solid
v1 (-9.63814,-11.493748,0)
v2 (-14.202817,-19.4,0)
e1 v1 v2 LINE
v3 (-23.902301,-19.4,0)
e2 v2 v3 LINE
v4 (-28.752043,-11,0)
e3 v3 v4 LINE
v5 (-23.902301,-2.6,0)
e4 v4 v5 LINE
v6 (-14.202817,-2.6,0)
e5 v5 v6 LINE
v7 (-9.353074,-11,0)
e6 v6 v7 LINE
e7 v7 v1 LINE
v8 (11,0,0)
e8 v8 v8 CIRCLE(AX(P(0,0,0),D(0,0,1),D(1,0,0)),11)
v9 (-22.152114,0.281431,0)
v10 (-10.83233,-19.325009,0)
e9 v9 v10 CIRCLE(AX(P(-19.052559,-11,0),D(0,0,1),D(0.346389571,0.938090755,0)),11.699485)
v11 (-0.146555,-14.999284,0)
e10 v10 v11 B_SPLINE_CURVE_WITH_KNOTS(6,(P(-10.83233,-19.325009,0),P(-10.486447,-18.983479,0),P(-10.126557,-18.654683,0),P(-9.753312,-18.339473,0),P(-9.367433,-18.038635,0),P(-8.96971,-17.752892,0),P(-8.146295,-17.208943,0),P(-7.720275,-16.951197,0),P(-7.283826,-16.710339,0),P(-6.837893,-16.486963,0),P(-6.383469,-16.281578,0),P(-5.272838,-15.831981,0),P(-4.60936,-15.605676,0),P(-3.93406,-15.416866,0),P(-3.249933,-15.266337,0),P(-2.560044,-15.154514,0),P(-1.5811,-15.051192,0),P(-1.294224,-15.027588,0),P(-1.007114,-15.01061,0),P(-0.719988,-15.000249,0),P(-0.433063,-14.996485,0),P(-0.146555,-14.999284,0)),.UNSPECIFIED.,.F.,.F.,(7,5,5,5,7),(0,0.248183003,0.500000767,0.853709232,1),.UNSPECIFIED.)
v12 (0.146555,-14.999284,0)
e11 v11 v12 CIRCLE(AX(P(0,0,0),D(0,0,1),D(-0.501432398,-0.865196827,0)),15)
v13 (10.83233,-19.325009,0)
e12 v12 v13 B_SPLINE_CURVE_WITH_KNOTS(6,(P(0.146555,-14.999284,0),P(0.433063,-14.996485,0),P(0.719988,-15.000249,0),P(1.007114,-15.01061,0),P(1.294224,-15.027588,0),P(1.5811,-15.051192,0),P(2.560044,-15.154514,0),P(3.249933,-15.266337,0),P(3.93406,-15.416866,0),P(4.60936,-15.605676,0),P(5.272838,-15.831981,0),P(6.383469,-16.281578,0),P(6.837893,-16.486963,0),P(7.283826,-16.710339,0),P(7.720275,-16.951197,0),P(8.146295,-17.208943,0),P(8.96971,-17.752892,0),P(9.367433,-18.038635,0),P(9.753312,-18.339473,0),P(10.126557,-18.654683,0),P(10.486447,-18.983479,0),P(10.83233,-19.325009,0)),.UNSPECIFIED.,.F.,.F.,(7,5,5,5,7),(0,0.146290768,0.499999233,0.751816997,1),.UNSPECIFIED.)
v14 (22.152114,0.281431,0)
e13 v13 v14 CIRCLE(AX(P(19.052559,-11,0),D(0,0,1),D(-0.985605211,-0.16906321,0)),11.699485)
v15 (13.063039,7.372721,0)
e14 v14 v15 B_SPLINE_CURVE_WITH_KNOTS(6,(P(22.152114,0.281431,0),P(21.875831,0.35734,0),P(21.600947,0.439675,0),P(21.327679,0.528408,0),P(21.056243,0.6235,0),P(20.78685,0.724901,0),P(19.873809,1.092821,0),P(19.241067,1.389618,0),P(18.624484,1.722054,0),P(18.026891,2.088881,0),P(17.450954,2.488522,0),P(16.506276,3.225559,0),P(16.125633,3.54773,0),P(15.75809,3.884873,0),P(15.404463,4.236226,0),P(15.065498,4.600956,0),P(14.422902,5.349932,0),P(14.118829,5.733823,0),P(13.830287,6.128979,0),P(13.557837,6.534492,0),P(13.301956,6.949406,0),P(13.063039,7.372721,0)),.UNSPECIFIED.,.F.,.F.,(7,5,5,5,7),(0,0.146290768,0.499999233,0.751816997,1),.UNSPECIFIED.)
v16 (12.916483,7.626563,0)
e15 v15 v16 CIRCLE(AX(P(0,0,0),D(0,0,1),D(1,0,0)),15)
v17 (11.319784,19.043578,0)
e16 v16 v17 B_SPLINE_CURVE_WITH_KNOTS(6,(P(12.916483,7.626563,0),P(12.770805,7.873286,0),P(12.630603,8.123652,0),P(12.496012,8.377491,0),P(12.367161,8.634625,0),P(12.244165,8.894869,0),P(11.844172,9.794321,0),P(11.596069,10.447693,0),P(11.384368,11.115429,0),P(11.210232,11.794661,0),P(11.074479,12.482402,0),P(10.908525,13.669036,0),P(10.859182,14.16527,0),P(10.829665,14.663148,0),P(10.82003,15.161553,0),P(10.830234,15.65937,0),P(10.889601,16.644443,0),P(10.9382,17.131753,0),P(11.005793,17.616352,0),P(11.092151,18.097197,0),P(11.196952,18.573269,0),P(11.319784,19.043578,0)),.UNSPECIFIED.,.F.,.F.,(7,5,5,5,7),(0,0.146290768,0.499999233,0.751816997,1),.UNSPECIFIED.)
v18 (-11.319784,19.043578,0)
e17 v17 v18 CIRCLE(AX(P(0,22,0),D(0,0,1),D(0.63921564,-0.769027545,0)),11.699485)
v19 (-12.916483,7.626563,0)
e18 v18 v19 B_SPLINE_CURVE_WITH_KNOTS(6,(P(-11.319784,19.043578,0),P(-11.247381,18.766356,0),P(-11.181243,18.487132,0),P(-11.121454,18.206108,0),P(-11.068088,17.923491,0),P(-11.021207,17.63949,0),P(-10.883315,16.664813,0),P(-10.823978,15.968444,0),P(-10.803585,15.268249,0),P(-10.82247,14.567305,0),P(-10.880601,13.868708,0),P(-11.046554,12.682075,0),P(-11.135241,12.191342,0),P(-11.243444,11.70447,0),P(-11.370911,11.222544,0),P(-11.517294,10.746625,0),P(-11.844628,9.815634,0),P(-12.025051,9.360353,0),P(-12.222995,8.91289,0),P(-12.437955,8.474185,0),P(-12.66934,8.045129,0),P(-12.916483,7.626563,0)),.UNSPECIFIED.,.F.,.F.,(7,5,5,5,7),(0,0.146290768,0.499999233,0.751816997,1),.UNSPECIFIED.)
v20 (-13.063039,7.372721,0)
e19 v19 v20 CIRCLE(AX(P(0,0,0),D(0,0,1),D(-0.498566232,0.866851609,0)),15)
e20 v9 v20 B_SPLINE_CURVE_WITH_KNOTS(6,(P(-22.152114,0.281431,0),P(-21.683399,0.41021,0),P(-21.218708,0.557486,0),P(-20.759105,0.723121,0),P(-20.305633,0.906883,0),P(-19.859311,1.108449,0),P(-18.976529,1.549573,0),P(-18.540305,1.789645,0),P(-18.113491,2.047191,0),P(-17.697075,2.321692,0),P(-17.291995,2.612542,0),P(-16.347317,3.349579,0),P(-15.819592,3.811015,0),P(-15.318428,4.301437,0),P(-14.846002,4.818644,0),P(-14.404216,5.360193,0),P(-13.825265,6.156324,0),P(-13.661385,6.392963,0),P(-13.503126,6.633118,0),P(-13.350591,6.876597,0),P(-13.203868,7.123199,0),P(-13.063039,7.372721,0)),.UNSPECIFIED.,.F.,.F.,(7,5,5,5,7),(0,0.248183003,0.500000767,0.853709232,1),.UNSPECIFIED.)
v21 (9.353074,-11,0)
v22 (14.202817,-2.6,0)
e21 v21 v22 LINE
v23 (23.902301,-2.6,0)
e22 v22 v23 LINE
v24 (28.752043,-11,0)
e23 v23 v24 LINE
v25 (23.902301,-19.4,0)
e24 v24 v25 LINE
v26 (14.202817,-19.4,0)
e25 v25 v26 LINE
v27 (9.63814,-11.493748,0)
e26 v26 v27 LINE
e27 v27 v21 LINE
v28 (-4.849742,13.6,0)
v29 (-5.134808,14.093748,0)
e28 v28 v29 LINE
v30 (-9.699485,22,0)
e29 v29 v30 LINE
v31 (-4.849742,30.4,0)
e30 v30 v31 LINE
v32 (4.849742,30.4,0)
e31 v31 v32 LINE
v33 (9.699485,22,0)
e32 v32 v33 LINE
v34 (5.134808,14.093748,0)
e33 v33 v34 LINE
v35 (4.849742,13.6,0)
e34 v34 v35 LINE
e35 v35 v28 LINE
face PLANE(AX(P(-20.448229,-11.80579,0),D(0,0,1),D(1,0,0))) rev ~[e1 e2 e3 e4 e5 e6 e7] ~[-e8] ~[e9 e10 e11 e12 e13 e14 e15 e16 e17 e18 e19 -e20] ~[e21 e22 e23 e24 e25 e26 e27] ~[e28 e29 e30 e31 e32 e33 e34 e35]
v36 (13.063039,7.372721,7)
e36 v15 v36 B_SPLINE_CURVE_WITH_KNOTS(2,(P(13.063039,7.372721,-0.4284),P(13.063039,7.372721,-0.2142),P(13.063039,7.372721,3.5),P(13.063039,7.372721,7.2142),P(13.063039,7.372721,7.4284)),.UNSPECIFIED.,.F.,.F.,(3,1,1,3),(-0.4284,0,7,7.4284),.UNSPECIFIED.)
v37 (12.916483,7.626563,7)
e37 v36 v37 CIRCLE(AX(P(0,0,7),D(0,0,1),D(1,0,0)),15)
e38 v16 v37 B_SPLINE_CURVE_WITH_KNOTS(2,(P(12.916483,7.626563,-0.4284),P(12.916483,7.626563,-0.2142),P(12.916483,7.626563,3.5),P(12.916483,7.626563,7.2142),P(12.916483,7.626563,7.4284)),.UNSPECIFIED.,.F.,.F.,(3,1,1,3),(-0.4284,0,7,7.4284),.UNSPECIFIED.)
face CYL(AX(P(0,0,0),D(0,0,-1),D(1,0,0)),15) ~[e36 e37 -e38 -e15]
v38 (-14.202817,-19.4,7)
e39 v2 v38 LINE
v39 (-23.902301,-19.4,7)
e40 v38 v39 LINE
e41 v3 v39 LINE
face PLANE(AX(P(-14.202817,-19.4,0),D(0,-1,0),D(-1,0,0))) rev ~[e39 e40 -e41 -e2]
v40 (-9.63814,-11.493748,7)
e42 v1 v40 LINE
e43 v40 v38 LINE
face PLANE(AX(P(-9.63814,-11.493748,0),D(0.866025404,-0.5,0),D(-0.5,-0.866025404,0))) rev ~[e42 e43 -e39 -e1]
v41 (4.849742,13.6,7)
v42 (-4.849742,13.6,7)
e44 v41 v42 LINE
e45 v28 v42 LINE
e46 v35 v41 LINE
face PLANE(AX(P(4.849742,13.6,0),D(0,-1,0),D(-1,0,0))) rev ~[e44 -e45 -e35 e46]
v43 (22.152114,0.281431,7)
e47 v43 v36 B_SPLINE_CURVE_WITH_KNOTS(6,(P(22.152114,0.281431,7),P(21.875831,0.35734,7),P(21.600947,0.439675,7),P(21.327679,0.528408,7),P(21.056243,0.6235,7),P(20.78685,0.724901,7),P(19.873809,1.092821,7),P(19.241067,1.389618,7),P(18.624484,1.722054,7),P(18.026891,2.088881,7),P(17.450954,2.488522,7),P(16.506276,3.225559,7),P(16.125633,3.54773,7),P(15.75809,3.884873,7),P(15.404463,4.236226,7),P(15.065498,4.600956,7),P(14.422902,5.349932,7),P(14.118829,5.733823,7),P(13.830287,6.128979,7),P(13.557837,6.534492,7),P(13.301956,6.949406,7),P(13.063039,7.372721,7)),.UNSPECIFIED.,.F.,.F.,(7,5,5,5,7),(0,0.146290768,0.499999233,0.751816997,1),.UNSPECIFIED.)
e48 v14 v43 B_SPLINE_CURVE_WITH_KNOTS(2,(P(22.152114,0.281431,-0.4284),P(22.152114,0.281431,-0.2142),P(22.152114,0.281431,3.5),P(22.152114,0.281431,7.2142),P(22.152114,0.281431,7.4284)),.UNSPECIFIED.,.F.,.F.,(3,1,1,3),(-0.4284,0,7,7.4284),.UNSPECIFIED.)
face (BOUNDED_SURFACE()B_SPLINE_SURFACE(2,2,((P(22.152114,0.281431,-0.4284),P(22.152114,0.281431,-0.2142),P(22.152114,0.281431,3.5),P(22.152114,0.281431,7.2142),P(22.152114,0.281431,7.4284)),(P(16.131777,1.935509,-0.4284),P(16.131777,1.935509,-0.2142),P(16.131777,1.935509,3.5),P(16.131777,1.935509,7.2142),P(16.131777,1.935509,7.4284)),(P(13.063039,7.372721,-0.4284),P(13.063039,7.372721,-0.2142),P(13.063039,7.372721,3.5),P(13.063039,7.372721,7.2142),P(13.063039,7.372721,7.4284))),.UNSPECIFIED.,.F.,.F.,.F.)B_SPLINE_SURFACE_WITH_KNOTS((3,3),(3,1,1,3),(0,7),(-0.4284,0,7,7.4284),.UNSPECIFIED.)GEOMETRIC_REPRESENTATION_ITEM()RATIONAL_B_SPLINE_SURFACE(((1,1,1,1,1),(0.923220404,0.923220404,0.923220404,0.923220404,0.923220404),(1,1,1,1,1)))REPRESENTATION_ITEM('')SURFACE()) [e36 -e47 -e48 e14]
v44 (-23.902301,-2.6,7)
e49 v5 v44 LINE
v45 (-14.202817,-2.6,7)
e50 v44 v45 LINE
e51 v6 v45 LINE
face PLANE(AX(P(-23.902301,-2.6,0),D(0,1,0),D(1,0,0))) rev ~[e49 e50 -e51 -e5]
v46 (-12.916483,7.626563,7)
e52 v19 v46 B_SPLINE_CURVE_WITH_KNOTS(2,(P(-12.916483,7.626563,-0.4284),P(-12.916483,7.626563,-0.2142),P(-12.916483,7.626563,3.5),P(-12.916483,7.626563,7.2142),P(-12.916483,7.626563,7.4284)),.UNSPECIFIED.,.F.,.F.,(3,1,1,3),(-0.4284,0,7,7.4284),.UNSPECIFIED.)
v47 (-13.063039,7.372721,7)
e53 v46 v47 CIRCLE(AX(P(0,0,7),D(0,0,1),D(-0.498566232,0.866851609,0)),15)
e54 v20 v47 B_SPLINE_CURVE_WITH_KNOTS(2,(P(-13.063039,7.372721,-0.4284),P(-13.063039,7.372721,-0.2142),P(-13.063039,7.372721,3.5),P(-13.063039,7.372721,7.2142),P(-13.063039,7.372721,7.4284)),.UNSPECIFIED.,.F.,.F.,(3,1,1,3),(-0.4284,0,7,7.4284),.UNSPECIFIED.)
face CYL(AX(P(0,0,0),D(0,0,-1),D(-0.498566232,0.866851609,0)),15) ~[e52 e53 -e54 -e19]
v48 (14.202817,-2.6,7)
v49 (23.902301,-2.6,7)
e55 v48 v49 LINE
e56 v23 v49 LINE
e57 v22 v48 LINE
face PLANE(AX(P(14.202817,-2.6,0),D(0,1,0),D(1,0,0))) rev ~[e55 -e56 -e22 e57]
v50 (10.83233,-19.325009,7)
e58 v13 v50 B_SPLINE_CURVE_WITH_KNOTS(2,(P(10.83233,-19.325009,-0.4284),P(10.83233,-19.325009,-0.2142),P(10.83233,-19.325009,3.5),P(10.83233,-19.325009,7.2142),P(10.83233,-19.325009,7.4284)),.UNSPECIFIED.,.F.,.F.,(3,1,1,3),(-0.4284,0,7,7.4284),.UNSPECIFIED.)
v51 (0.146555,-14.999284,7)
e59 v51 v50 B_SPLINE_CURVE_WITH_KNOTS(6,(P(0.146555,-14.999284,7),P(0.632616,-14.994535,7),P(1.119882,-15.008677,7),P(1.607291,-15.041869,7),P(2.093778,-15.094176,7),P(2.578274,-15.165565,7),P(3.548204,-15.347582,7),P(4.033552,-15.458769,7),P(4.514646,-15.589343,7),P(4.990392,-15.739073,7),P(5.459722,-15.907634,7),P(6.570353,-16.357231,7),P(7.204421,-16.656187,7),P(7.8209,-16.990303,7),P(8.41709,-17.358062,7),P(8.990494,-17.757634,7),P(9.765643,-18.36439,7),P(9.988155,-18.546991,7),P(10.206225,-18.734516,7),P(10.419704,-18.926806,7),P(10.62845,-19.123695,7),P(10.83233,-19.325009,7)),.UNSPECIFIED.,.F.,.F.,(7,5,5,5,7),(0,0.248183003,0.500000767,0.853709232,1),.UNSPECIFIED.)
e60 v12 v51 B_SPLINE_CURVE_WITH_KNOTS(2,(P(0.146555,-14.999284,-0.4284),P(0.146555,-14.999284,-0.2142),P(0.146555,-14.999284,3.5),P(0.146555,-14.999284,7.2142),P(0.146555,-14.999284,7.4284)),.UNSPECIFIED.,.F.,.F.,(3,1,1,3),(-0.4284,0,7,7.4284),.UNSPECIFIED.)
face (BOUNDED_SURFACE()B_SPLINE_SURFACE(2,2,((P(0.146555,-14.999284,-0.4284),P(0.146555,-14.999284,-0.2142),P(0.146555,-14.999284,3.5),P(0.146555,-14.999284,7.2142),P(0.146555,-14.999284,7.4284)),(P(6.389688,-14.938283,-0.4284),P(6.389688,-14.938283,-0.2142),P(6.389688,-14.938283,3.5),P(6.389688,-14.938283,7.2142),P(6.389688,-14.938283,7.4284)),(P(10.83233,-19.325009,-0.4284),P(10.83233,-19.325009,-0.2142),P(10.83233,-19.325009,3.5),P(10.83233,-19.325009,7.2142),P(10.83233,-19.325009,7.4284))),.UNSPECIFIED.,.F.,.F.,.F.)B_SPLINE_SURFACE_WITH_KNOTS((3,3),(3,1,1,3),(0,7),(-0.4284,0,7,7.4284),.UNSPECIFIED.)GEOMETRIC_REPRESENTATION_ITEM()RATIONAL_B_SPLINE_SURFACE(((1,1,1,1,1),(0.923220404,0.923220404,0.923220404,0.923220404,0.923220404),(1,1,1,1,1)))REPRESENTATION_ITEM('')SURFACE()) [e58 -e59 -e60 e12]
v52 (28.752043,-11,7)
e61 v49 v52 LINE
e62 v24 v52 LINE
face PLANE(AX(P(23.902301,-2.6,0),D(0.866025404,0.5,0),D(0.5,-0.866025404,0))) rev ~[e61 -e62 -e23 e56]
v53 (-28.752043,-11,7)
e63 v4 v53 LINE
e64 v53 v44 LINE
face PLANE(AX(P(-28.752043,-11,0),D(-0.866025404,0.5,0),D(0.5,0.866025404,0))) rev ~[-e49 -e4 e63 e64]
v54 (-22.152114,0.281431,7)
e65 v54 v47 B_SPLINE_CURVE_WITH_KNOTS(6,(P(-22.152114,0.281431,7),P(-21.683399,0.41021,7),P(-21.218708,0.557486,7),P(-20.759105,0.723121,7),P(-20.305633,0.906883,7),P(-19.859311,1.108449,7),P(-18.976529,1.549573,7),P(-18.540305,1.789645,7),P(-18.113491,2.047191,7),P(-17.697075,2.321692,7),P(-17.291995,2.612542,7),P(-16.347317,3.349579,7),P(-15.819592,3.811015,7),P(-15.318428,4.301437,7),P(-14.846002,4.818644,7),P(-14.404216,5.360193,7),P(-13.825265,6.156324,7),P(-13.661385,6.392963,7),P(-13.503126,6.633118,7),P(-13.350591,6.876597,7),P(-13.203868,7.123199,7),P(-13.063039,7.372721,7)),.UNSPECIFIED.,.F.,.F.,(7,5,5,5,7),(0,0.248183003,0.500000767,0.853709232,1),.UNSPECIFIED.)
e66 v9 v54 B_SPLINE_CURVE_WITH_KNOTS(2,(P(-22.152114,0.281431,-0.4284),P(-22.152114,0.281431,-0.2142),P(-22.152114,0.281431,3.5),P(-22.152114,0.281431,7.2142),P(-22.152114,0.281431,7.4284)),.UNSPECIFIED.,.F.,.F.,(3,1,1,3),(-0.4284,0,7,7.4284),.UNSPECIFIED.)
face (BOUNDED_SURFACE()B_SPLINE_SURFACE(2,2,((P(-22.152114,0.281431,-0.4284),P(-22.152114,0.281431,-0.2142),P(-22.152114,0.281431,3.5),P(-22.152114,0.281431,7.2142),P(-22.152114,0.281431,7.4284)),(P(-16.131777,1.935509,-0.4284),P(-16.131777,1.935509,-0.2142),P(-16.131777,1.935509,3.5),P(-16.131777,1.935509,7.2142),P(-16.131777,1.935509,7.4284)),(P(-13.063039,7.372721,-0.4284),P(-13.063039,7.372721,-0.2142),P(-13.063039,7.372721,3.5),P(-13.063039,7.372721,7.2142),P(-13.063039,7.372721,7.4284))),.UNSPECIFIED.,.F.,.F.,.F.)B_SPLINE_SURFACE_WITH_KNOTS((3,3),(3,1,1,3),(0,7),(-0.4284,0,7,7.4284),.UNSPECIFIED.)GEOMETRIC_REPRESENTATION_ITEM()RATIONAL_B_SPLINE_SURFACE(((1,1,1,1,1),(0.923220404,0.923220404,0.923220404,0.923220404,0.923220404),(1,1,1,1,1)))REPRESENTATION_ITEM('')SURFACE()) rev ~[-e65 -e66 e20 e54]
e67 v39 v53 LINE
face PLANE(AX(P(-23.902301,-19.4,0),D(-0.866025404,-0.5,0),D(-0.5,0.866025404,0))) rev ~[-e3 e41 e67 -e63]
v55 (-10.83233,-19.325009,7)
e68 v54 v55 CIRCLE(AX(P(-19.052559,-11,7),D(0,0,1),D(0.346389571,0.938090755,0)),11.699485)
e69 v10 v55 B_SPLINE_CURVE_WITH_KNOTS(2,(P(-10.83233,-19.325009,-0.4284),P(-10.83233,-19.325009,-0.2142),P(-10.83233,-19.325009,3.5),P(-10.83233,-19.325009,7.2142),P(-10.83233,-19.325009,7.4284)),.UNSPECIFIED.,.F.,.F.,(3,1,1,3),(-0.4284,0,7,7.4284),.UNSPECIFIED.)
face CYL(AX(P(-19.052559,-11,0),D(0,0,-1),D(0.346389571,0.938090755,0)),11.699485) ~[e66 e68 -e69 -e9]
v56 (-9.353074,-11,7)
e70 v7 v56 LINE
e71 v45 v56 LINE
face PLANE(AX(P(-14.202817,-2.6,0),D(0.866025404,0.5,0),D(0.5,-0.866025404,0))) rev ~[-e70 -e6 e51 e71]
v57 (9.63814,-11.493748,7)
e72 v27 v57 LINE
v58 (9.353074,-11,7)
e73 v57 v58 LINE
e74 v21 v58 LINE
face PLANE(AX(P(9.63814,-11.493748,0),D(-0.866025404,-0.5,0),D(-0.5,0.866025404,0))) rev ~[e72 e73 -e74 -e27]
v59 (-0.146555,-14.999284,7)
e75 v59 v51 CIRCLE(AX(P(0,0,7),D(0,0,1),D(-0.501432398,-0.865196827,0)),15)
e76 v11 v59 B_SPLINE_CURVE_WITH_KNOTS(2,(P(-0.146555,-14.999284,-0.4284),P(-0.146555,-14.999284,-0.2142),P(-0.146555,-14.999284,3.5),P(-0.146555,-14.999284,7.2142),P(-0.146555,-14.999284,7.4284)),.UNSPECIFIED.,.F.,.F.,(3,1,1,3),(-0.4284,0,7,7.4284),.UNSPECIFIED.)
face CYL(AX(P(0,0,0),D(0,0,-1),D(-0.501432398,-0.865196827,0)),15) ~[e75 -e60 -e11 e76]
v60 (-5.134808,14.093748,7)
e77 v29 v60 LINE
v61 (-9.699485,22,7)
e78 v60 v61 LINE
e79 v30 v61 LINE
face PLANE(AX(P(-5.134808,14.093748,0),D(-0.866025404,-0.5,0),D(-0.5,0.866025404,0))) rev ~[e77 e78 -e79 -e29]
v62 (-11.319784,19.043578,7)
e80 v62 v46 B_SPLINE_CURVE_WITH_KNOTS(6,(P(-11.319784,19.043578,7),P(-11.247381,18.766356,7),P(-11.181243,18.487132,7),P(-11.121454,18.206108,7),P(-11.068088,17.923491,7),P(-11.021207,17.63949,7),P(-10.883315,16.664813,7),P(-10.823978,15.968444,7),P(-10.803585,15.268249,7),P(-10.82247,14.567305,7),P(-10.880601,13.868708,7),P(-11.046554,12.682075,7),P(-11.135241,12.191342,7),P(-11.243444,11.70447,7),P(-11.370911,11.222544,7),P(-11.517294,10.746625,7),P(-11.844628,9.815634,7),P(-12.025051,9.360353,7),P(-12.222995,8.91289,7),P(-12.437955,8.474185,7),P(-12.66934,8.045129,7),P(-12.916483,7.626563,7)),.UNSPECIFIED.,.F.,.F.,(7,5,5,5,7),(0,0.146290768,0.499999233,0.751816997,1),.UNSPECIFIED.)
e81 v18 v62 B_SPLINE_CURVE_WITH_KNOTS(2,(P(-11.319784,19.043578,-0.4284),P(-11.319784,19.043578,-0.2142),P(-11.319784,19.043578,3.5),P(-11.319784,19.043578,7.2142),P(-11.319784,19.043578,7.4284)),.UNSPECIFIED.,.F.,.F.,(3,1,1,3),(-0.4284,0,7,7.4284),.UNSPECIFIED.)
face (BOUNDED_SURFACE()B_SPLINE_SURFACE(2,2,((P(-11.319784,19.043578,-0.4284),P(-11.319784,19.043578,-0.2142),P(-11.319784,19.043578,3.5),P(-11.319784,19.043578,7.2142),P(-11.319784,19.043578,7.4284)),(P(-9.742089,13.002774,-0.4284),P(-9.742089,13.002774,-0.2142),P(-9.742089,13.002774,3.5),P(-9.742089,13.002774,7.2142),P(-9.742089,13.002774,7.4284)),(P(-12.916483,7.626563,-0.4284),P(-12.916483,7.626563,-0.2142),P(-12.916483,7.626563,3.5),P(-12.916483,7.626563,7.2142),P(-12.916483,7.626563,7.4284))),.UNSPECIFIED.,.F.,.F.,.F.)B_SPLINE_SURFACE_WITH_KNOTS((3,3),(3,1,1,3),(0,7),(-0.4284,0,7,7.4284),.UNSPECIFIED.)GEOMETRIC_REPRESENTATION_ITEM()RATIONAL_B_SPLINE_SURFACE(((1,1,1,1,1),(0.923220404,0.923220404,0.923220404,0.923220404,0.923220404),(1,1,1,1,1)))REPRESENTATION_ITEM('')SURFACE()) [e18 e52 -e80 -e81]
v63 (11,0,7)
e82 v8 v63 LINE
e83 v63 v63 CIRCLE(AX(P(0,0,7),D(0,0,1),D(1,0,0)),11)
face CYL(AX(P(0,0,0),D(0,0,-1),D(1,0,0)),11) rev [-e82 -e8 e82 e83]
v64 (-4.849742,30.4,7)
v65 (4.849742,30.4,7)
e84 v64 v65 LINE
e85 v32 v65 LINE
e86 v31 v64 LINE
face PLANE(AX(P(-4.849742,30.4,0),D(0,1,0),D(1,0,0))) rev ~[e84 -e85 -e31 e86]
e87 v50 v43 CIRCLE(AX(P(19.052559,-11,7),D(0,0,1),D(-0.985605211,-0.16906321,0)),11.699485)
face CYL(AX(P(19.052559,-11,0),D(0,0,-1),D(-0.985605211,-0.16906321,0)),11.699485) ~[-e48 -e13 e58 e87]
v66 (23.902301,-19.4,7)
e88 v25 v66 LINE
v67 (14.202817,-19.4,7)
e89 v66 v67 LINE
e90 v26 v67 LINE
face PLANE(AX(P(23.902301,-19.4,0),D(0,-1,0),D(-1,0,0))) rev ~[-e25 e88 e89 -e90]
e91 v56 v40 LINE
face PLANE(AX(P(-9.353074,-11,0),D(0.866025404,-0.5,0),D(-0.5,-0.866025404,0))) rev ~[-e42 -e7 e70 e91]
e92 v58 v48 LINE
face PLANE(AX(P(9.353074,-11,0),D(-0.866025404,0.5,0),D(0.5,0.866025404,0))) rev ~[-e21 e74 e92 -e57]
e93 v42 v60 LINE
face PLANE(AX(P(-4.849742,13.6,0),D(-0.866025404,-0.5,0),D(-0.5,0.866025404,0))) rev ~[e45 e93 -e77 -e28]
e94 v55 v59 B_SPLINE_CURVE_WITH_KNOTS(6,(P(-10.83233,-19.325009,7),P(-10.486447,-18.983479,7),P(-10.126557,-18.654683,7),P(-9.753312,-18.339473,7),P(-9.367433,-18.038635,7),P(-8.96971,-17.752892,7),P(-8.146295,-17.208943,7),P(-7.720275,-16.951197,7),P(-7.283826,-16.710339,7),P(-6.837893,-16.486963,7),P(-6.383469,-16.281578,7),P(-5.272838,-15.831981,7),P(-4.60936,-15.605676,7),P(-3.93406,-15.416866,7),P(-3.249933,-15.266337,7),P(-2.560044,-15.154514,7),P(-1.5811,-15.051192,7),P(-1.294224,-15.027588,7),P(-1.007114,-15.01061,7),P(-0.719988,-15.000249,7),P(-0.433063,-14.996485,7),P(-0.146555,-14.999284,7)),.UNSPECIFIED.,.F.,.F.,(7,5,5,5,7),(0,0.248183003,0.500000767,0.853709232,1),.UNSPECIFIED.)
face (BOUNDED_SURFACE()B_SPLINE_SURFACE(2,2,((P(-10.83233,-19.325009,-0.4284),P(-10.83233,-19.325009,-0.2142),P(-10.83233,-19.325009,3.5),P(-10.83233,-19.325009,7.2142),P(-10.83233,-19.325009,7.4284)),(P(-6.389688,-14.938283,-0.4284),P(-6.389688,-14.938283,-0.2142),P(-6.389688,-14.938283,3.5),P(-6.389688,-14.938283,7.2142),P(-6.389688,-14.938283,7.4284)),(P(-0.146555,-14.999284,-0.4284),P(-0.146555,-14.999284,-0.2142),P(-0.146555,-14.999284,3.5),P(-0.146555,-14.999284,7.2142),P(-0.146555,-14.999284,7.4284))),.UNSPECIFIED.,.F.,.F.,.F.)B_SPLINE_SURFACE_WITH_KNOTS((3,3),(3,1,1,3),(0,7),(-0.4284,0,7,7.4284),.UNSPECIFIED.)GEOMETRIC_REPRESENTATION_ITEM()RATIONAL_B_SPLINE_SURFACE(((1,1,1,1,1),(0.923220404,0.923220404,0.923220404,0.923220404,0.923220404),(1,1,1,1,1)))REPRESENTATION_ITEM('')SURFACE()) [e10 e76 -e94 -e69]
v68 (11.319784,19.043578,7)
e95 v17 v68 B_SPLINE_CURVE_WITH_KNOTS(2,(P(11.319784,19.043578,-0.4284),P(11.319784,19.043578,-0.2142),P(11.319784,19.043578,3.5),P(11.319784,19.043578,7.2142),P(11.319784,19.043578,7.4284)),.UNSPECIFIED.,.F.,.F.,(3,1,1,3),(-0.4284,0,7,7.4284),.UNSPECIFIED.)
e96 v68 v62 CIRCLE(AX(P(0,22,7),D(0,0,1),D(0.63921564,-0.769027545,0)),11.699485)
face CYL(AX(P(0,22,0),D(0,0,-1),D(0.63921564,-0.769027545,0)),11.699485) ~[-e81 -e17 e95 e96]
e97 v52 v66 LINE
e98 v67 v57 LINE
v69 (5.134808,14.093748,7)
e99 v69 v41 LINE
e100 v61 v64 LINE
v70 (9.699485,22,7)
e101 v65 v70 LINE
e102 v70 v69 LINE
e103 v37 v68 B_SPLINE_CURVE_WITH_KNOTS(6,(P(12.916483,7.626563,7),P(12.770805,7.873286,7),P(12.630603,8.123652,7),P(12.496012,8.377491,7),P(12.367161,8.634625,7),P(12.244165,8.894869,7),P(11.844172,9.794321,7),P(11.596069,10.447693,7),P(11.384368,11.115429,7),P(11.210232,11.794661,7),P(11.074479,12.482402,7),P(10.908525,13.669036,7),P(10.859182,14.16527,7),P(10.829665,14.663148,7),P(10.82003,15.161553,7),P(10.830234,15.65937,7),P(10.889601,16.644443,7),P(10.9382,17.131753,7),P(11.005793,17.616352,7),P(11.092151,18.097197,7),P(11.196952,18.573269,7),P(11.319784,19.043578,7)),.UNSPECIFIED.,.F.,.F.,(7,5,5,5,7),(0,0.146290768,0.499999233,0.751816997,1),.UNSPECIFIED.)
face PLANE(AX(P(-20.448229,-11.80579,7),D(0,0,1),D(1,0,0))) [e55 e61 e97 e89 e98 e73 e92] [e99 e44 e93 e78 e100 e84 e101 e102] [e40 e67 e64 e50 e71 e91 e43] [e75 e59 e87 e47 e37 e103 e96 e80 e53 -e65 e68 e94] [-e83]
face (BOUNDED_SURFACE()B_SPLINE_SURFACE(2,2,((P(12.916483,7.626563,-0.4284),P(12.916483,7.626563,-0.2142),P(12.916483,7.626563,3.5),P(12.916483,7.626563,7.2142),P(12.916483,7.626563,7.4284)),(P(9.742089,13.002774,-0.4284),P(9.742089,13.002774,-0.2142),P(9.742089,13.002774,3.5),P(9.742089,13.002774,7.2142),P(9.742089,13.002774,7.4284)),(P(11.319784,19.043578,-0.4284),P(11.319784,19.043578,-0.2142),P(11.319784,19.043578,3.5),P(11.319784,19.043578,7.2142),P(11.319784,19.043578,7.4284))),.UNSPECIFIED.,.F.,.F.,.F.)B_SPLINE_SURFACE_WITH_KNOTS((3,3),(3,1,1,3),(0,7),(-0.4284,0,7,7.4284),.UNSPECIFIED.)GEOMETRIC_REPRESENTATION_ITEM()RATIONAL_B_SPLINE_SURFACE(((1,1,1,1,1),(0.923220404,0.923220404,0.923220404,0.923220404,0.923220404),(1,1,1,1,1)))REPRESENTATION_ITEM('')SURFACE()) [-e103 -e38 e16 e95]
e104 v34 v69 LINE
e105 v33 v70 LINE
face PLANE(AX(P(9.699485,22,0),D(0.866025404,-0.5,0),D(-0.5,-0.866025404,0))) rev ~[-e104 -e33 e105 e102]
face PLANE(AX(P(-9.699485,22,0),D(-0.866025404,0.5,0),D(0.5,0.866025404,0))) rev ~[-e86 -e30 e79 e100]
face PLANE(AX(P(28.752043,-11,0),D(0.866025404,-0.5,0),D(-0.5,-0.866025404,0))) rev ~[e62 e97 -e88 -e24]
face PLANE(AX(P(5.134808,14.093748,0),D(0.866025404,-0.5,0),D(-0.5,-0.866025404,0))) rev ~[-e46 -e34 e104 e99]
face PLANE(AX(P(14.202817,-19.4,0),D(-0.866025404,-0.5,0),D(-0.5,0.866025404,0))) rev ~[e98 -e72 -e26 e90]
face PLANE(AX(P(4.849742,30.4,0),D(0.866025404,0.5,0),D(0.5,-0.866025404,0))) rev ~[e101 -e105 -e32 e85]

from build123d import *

# Parameters (mm, degrees)
F0_R     = 11
F1_DEPTH = 7
F2_R     = 15


with BuildPart() as f1:
    # F0 (on Top) → F1 (new body)
    with BuildSketch(Plane.XY):
        with BuildLine():
            ThreePointArc((-14.7729482501, -2.6), (-14.9420444362, -1.3173109227), (-14.9999794627, -0.0248217267))
            ThreePointArc((-14.9999794627, -0.0248217267), (-29.1846096908, -16.8497422612), (-7.5214859773, -12.9779524076))
            ThreePointArc((-7.5214859773, -12.9779524076), (-8.6118469419, -12.2815346048), (-9.6381401749, -11.4937484734))
            Line((-9.6381401749, -11.4937484734), (-14.2028166221, -19.4))
            Line((-14.2028166221, -19.4), (-23.9023011445, -19.4))
            Line((-23.9023011445, -19.4), (-28.7520434056, -11))
            Line((-28.7520434056, -11), (-23.9023011445, -2.6))
            Line((-23.9023011445, -2.6), (-14.7729482501, -2.6))
        make_face()
        with BuildLine():
            ThreePointArc((14.9999794627, -0.0248217267), (14.9999948657, -0.0124108676), (15, 0))
            ThreePointArc((15, 0), (12.9841711765, 7.5107455595), (7.4784934854, 13.0027741343))
            ThreePointArc((7.4784934854, 13.0027741343), (6.3301974943, 13.5988455276), (5.1348080752, 14.0937484734))
            Line((5.1348080752, 14.0937484734), (4.8497422612, 13.6))
            Line((4.8497422612, 13.6), (-4.8497422612, 13.6))
            Line((-4.8497422612, 13.6), (-5.1348080752, 14.0937484734))
            ThreePointArc((-5.1348080752, 14.0937484734), (-6.3301974943, 13.5988455276), (-7.4784934854, 13.0027741343))
            ThreePointArc((-7.4784934854, 13.0027741343), (-12.9903810568, 7.5), (-14.9999794627, -0.0248217267))
            ThreePointArc((-14.9999794627, -0.0248217267), (-14.9420444362, -1.3173109227), (-14.7729482501, -2.6))
            Line((-14.7729482501, -2.6), (-14.2028166221, -2.6))
            Line((-14.2028166221, -2.6), (-9.3530743609, -11))
            Line((-9.3530743609, -11), (-9.6381401749, -11.4937484734))
            ThreePointArc((-9.6381401749, -11.4937484734), (-8.6118469419, -12.2815346048), (-7.5214859773, -12.9779524076))
            ThreePointArc((-7.5214859773, -12.9779524076), (0, -15), (7.5214859773, -12.9779524076))
            ThreePointArc((7.5214859773, -12.9779524076), (8.6118469419, -12.2815346048), (9.6381401749, -11.4937484734))
            Line((9.6381401749, -11.4937484734), (9.3530743609, -11))
            Line((9.3530743609, -11), (14.2028166221, -2.6))
            Line((14.2028166221, -2.6), (14.7729482501, -2.6))
            ThreePointArc((14.7729482501, -2.6), (14.9420444362, -1.3173109227), (14.9999794627, -0.0248217267))
        make_face()
        Circle(F0_R, mode=Mode.SUBTRACT)
        with BuildLine():
            ThreePointArc((7.5214859773, -12.9779524076), (29.1846096908, -16.8497422612), (14.9999794627, -0.0248217267))
            ThreePointArc((14.9999794627, -0.0248217267), (14.9420444362, -1.3173109227), (14.7729482501, -2.6))
            Line((14.7729482501, -2.6), (23.9023011445, -2.6))
            Line((23.9023011445, -2.6), (28.7520434056, -11))
            Line((28.7520434056, -11), (23.9023011445, -19.4))
            Line((23.9023011445, -19.4), (14.2028166221, -19.4))
            Line((14.2028166221, -19.4), (9.6381401749, -11.4937484734))
            ThreePointArc((9.6381401749, -11.4937484734), (8.6118469419, -12.2815346048), (7.5214859773, -12.9779524076))
        make_face()
        with BuildLine():
            ThreePointArc((5.1348080752, 14.0937484734), (6.3301974943, 13.5988455276), (7.4784934854, 13.0027741343))
            ThreePointArc((7.4784934854, 13.0027741343), (0, 33.6994845224), (-7.4784934854, 13.0027741343))
            ThreePointArc((-7.4784934854, 13.0027741343), (-6.3301974943, 13.5988455276), (-5.1348080752, 14.0937484734))
            Line((-5.1348080752, 14.0937484734), (-9.6994845224, 22))
            Line((-9.6994845224, 22), (-4.8497422612, 30.4))
            Line((-4.8497422612, 30.4), (4.8497422612, 30.4))
            Line((4.8497422612, 30.4), (9.6994845224, 22))
            Line((9.6994845224, 22), (5.1348080752, 14.0937484734))
        make_face()
    extrude(amount=F1_DEPTH)

    # F2
    f2_edges = [f1.edges().sort_by_distance(p)[0] for p in [
        (7.521486, -12.977952, 3.5),
        (-14.999979, -0.024822, 3.5),
        (7.478493, 13.002774, 3.5),
        (-7.521486, -12.977952, 3.5),
        (14.999979, -0.024822, 3.5),
        (-7.478493, 13.002774, 3.5),
    ]]
    fillet(f2_edges, radius=F2_R)


solid = f1.part
